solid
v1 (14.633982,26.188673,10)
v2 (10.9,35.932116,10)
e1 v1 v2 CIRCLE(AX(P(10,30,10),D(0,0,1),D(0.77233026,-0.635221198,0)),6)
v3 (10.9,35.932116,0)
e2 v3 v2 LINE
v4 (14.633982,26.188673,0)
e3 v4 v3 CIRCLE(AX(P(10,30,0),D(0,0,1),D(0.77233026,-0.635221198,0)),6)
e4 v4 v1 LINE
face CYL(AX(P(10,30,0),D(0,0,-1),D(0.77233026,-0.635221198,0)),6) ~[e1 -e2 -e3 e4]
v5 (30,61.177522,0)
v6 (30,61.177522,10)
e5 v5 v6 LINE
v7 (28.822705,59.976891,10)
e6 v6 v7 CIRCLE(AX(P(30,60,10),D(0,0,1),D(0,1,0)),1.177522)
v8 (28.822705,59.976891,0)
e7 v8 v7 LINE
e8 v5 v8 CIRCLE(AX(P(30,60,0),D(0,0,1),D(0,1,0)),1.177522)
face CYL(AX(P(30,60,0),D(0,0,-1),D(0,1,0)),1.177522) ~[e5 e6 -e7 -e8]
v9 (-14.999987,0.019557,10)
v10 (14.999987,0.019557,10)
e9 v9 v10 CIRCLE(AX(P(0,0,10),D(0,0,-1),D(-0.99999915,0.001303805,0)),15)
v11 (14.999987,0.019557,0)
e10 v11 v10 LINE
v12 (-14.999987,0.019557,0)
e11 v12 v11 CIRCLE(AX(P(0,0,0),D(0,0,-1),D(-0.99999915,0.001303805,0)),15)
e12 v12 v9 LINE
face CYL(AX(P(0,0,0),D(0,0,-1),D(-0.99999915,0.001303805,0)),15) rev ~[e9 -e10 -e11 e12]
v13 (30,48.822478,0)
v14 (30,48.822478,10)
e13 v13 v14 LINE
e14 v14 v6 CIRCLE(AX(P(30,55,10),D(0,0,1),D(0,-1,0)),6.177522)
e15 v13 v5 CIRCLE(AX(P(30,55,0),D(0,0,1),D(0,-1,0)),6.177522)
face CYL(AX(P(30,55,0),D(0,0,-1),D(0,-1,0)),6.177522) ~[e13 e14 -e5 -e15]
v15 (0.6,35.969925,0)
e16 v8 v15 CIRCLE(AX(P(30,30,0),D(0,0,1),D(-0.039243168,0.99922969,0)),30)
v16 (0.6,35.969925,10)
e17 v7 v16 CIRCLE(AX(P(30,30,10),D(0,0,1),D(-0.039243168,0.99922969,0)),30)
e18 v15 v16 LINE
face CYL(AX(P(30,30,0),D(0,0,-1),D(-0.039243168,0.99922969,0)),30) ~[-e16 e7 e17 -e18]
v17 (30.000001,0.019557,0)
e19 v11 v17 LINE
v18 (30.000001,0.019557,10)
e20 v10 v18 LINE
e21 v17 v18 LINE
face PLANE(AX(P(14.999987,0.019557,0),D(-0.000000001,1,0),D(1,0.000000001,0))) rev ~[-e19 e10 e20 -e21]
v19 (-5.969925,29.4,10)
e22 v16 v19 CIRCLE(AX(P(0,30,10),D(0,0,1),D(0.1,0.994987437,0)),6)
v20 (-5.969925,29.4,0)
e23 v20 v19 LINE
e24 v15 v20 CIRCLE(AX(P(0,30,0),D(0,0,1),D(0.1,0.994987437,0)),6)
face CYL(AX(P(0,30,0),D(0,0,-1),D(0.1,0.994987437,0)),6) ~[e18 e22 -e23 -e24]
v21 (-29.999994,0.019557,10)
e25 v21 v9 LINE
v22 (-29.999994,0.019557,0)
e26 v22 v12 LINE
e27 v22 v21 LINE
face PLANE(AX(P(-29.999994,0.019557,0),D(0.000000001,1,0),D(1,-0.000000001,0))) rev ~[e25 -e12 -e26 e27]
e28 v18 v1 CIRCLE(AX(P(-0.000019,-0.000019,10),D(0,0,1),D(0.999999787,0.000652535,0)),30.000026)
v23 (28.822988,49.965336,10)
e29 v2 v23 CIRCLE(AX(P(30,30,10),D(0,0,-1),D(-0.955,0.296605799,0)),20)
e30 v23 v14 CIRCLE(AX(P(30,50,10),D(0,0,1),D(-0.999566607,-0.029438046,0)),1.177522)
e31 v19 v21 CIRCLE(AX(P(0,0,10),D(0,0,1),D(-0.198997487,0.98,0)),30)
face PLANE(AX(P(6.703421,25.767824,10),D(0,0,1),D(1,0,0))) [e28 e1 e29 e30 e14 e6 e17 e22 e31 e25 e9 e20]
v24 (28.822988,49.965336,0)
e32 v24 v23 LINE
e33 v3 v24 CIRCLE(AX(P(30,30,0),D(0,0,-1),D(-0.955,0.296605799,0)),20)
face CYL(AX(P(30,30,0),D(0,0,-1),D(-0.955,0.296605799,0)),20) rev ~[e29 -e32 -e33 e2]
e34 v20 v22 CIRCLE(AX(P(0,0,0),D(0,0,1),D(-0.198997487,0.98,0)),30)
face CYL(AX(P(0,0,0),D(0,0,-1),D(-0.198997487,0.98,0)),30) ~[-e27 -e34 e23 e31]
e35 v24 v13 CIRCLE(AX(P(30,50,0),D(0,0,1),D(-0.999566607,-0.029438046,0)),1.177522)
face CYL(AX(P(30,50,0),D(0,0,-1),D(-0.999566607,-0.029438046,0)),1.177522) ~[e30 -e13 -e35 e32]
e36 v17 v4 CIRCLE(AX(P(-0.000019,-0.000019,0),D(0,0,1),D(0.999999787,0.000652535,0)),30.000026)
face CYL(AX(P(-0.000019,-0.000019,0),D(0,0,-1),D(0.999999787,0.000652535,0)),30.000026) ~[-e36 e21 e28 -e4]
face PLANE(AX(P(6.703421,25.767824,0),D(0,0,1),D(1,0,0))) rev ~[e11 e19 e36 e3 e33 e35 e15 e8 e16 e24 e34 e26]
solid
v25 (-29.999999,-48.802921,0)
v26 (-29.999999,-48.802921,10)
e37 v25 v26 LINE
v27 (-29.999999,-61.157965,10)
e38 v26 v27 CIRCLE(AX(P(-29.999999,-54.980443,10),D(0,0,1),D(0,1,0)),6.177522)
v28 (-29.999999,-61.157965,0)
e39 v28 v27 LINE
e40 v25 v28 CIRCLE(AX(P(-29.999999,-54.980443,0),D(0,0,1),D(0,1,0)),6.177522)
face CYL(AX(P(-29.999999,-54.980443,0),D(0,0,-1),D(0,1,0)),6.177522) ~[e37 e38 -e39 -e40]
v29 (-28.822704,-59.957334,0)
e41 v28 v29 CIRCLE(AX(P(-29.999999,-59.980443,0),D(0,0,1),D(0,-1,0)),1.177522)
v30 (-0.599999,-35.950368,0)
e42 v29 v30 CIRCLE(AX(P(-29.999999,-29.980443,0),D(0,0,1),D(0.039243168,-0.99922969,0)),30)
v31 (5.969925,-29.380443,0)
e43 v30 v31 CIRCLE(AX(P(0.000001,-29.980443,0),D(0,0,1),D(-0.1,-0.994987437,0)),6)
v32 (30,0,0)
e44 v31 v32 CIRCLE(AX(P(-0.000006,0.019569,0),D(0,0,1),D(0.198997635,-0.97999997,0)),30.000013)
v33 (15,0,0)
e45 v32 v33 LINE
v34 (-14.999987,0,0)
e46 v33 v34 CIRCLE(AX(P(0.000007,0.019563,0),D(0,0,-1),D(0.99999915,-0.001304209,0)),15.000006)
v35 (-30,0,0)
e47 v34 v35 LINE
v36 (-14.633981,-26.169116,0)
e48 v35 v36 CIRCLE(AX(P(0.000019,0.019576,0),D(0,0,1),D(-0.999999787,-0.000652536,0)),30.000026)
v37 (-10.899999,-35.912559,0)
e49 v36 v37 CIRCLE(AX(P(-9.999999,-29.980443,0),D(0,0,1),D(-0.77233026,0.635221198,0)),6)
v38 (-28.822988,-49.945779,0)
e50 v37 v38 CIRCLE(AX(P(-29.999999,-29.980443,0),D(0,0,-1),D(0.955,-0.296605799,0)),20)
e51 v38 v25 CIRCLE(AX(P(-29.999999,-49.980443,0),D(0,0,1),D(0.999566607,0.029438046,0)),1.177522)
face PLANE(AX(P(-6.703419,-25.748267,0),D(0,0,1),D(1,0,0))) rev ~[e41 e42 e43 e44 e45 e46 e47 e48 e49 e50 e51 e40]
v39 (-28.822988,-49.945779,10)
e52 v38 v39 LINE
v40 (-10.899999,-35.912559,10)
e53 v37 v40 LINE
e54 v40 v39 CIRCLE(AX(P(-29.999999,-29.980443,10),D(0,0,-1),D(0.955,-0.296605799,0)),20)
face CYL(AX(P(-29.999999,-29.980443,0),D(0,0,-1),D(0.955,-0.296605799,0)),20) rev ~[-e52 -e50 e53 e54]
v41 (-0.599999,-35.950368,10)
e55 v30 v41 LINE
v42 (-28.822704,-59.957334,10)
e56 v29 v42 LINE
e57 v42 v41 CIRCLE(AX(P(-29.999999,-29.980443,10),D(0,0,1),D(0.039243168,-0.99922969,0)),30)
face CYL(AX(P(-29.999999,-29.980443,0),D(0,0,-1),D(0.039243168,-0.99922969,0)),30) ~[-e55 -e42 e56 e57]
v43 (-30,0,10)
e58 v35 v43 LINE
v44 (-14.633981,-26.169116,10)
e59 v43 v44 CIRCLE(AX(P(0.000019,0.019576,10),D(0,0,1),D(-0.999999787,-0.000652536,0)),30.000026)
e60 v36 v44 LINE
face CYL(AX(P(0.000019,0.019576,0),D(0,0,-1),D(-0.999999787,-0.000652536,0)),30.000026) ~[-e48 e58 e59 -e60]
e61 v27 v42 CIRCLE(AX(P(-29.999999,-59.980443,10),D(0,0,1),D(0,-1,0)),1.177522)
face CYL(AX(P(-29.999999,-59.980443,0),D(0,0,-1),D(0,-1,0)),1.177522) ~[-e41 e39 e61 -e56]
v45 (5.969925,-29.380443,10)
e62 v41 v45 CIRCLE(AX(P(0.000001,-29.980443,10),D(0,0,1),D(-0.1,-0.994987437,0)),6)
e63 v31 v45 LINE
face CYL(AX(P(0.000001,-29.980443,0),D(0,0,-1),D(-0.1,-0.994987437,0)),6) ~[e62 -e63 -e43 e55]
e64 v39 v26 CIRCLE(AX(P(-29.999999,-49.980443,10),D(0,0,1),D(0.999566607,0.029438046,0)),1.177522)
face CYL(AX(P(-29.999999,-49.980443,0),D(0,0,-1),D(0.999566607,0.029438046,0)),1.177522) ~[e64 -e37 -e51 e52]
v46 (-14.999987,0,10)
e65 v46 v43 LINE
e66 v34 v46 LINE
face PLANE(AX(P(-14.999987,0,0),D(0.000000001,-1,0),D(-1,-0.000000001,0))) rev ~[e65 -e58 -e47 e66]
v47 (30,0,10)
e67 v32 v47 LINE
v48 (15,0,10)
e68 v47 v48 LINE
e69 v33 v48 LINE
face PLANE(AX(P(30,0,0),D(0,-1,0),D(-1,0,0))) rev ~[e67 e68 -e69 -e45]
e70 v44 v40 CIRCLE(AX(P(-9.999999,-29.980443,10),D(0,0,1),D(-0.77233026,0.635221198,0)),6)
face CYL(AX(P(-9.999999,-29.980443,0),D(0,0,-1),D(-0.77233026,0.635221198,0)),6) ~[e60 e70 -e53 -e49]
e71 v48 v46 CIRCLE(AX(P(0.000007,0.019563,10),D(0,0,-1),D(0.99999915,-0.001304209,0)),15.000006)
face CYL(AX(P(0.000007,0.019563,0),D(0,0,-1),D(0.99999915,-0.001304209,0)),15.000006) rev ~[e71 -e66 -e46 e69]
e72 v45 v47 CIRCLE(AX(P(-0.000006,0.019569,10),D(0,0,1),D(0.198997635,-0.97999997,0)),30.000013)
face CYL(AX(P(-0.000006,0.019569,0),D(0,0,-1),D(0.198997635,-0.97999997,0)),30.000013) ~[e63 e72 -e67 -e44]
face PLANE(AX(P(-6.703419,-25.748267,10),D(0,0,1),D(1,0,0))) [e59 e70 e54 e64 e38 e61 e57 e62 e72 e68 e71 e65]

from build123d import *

# Parameters (mm, degrees)
F1_DEPTH = 10


# Not quite as in the source:
# - ends of sketch curves that miss each other by under 0.0002 mm in the source are joined


with BuildPart() as f1:
    # F0 (on Top) → F1 (new body)
    with BuildSketch(Plane.XY):
        with BuildLine():
            Line((30, 0), (15, 0))
            ThreePointArc((15, 0), (6.697e-07, -14.9804429115), (-14.9999865801, 1.75e-08))
            Line((-14.9999865801, 1.75e-08), (-30, 0))
            ThreePointArc((-30, 0), (-25.8699353497, -15.1707822858), (-14.6339808876, -26.1691157255))
            ThreePointArc((-14.6339808876, -26.1691157255), (-15.6026691532, -32.1275551224), (-10.8999993294, -35.9125588915))
            ThreePointArc((-10.8999993294, -35.9125588915), (-17.6702744626, -45.7277564826), (-28.8229878287, -49.94577897))
            ThreePointArc((-28.8229878287, -49.94577897), (-29.1797127595, -49.1356425772), (-29.9999993294, -48.8029210808))
            ThreePointArc((-29.9999993294, -48.8029210808), (-36.1775211601, -54.9804429115), (-29.9999993294, -61.1579647422))
            ThreePointArc((-29.9999993294, -61.1579647422), (-29.1592349866, -60.8048657287), (-28.8227042848, -59.9573336171))
            ThreePointArc((-28.8227042848, -59.9573336171), (-10.5622435899, -52.8315621797), (-0.5999993294, -35.9503675342))
            ThreePointArc((-0.5999993294, -35.9503675342), (4.2426413577, -34.2230835986), (5.9699252932, -29.3804429115))
            ThreePointArc((5.9699252932, -29.3804429115), (23.222002332, -18.9735637408), (30, 0))
        make_face()
    extrude(amount=F1_DEPTH)


with BuildPart() as f1b:
    # F0 (on Top) → F1, piece 2 (new body)
    with BuildSketch(Plane.XY):
        with BuildLine():
            ThreePointArc((-14.9999872507, 0.0195570727), (9e-10, 15), (14.9999872507, 0.019557071))
            Line((14.9999872507, 0.019557071), (30.0000006706, 0.0195570885))
            ThreePointArc((30.0000006706, 0.0195570885), (25.8699360203, 15.1903393743), (14.6339815581, 26.188672814))
            ThreePointArc((14.6339815581, 26.188672814), (15.6026698237, 32.1471122109), (10.9, 35.93211598))
            ThreePointArc((10.9, 35.93211598), (17.6702751331, 45.7473135711), (28.8229884993, 49.9653360585))
            ThreePointArc((28.8229884993, 49.9653360585), (29.17971343, 49.1551996657), (30, 48.8224781693))
            ThreePointArc((30, 48.8224781693), (36.1775218307, 55), (30, 61.1775218307))
            ThreePointArc((30, 61.1775218307), (29.1592356572, 60.8244228172), (28.8227049553, 59.9768907056))
            ThreePointArc((28.8227049553, 59.9768907056), (10.5622442605, 52.8511192682), (0.6, 35.9699246226))
            ThreePointArc((0.6, 35.9699246226), (-4.2426406871, 34.2426406871), (-5.9699246226, 29.4))
            ThreePointArc((-5.9699246226, 29.4), (-23.2220016615, 18.9931208293), (-29.9999936253, 0.0195570848))
            Line((-29.9999936253, 0.0195570848), (-14.9999872507, 0.0195570727))
        make_face()
    extrude(amount=F1_DEPTH)


solid = Compound([f1.part, f1b.part])
